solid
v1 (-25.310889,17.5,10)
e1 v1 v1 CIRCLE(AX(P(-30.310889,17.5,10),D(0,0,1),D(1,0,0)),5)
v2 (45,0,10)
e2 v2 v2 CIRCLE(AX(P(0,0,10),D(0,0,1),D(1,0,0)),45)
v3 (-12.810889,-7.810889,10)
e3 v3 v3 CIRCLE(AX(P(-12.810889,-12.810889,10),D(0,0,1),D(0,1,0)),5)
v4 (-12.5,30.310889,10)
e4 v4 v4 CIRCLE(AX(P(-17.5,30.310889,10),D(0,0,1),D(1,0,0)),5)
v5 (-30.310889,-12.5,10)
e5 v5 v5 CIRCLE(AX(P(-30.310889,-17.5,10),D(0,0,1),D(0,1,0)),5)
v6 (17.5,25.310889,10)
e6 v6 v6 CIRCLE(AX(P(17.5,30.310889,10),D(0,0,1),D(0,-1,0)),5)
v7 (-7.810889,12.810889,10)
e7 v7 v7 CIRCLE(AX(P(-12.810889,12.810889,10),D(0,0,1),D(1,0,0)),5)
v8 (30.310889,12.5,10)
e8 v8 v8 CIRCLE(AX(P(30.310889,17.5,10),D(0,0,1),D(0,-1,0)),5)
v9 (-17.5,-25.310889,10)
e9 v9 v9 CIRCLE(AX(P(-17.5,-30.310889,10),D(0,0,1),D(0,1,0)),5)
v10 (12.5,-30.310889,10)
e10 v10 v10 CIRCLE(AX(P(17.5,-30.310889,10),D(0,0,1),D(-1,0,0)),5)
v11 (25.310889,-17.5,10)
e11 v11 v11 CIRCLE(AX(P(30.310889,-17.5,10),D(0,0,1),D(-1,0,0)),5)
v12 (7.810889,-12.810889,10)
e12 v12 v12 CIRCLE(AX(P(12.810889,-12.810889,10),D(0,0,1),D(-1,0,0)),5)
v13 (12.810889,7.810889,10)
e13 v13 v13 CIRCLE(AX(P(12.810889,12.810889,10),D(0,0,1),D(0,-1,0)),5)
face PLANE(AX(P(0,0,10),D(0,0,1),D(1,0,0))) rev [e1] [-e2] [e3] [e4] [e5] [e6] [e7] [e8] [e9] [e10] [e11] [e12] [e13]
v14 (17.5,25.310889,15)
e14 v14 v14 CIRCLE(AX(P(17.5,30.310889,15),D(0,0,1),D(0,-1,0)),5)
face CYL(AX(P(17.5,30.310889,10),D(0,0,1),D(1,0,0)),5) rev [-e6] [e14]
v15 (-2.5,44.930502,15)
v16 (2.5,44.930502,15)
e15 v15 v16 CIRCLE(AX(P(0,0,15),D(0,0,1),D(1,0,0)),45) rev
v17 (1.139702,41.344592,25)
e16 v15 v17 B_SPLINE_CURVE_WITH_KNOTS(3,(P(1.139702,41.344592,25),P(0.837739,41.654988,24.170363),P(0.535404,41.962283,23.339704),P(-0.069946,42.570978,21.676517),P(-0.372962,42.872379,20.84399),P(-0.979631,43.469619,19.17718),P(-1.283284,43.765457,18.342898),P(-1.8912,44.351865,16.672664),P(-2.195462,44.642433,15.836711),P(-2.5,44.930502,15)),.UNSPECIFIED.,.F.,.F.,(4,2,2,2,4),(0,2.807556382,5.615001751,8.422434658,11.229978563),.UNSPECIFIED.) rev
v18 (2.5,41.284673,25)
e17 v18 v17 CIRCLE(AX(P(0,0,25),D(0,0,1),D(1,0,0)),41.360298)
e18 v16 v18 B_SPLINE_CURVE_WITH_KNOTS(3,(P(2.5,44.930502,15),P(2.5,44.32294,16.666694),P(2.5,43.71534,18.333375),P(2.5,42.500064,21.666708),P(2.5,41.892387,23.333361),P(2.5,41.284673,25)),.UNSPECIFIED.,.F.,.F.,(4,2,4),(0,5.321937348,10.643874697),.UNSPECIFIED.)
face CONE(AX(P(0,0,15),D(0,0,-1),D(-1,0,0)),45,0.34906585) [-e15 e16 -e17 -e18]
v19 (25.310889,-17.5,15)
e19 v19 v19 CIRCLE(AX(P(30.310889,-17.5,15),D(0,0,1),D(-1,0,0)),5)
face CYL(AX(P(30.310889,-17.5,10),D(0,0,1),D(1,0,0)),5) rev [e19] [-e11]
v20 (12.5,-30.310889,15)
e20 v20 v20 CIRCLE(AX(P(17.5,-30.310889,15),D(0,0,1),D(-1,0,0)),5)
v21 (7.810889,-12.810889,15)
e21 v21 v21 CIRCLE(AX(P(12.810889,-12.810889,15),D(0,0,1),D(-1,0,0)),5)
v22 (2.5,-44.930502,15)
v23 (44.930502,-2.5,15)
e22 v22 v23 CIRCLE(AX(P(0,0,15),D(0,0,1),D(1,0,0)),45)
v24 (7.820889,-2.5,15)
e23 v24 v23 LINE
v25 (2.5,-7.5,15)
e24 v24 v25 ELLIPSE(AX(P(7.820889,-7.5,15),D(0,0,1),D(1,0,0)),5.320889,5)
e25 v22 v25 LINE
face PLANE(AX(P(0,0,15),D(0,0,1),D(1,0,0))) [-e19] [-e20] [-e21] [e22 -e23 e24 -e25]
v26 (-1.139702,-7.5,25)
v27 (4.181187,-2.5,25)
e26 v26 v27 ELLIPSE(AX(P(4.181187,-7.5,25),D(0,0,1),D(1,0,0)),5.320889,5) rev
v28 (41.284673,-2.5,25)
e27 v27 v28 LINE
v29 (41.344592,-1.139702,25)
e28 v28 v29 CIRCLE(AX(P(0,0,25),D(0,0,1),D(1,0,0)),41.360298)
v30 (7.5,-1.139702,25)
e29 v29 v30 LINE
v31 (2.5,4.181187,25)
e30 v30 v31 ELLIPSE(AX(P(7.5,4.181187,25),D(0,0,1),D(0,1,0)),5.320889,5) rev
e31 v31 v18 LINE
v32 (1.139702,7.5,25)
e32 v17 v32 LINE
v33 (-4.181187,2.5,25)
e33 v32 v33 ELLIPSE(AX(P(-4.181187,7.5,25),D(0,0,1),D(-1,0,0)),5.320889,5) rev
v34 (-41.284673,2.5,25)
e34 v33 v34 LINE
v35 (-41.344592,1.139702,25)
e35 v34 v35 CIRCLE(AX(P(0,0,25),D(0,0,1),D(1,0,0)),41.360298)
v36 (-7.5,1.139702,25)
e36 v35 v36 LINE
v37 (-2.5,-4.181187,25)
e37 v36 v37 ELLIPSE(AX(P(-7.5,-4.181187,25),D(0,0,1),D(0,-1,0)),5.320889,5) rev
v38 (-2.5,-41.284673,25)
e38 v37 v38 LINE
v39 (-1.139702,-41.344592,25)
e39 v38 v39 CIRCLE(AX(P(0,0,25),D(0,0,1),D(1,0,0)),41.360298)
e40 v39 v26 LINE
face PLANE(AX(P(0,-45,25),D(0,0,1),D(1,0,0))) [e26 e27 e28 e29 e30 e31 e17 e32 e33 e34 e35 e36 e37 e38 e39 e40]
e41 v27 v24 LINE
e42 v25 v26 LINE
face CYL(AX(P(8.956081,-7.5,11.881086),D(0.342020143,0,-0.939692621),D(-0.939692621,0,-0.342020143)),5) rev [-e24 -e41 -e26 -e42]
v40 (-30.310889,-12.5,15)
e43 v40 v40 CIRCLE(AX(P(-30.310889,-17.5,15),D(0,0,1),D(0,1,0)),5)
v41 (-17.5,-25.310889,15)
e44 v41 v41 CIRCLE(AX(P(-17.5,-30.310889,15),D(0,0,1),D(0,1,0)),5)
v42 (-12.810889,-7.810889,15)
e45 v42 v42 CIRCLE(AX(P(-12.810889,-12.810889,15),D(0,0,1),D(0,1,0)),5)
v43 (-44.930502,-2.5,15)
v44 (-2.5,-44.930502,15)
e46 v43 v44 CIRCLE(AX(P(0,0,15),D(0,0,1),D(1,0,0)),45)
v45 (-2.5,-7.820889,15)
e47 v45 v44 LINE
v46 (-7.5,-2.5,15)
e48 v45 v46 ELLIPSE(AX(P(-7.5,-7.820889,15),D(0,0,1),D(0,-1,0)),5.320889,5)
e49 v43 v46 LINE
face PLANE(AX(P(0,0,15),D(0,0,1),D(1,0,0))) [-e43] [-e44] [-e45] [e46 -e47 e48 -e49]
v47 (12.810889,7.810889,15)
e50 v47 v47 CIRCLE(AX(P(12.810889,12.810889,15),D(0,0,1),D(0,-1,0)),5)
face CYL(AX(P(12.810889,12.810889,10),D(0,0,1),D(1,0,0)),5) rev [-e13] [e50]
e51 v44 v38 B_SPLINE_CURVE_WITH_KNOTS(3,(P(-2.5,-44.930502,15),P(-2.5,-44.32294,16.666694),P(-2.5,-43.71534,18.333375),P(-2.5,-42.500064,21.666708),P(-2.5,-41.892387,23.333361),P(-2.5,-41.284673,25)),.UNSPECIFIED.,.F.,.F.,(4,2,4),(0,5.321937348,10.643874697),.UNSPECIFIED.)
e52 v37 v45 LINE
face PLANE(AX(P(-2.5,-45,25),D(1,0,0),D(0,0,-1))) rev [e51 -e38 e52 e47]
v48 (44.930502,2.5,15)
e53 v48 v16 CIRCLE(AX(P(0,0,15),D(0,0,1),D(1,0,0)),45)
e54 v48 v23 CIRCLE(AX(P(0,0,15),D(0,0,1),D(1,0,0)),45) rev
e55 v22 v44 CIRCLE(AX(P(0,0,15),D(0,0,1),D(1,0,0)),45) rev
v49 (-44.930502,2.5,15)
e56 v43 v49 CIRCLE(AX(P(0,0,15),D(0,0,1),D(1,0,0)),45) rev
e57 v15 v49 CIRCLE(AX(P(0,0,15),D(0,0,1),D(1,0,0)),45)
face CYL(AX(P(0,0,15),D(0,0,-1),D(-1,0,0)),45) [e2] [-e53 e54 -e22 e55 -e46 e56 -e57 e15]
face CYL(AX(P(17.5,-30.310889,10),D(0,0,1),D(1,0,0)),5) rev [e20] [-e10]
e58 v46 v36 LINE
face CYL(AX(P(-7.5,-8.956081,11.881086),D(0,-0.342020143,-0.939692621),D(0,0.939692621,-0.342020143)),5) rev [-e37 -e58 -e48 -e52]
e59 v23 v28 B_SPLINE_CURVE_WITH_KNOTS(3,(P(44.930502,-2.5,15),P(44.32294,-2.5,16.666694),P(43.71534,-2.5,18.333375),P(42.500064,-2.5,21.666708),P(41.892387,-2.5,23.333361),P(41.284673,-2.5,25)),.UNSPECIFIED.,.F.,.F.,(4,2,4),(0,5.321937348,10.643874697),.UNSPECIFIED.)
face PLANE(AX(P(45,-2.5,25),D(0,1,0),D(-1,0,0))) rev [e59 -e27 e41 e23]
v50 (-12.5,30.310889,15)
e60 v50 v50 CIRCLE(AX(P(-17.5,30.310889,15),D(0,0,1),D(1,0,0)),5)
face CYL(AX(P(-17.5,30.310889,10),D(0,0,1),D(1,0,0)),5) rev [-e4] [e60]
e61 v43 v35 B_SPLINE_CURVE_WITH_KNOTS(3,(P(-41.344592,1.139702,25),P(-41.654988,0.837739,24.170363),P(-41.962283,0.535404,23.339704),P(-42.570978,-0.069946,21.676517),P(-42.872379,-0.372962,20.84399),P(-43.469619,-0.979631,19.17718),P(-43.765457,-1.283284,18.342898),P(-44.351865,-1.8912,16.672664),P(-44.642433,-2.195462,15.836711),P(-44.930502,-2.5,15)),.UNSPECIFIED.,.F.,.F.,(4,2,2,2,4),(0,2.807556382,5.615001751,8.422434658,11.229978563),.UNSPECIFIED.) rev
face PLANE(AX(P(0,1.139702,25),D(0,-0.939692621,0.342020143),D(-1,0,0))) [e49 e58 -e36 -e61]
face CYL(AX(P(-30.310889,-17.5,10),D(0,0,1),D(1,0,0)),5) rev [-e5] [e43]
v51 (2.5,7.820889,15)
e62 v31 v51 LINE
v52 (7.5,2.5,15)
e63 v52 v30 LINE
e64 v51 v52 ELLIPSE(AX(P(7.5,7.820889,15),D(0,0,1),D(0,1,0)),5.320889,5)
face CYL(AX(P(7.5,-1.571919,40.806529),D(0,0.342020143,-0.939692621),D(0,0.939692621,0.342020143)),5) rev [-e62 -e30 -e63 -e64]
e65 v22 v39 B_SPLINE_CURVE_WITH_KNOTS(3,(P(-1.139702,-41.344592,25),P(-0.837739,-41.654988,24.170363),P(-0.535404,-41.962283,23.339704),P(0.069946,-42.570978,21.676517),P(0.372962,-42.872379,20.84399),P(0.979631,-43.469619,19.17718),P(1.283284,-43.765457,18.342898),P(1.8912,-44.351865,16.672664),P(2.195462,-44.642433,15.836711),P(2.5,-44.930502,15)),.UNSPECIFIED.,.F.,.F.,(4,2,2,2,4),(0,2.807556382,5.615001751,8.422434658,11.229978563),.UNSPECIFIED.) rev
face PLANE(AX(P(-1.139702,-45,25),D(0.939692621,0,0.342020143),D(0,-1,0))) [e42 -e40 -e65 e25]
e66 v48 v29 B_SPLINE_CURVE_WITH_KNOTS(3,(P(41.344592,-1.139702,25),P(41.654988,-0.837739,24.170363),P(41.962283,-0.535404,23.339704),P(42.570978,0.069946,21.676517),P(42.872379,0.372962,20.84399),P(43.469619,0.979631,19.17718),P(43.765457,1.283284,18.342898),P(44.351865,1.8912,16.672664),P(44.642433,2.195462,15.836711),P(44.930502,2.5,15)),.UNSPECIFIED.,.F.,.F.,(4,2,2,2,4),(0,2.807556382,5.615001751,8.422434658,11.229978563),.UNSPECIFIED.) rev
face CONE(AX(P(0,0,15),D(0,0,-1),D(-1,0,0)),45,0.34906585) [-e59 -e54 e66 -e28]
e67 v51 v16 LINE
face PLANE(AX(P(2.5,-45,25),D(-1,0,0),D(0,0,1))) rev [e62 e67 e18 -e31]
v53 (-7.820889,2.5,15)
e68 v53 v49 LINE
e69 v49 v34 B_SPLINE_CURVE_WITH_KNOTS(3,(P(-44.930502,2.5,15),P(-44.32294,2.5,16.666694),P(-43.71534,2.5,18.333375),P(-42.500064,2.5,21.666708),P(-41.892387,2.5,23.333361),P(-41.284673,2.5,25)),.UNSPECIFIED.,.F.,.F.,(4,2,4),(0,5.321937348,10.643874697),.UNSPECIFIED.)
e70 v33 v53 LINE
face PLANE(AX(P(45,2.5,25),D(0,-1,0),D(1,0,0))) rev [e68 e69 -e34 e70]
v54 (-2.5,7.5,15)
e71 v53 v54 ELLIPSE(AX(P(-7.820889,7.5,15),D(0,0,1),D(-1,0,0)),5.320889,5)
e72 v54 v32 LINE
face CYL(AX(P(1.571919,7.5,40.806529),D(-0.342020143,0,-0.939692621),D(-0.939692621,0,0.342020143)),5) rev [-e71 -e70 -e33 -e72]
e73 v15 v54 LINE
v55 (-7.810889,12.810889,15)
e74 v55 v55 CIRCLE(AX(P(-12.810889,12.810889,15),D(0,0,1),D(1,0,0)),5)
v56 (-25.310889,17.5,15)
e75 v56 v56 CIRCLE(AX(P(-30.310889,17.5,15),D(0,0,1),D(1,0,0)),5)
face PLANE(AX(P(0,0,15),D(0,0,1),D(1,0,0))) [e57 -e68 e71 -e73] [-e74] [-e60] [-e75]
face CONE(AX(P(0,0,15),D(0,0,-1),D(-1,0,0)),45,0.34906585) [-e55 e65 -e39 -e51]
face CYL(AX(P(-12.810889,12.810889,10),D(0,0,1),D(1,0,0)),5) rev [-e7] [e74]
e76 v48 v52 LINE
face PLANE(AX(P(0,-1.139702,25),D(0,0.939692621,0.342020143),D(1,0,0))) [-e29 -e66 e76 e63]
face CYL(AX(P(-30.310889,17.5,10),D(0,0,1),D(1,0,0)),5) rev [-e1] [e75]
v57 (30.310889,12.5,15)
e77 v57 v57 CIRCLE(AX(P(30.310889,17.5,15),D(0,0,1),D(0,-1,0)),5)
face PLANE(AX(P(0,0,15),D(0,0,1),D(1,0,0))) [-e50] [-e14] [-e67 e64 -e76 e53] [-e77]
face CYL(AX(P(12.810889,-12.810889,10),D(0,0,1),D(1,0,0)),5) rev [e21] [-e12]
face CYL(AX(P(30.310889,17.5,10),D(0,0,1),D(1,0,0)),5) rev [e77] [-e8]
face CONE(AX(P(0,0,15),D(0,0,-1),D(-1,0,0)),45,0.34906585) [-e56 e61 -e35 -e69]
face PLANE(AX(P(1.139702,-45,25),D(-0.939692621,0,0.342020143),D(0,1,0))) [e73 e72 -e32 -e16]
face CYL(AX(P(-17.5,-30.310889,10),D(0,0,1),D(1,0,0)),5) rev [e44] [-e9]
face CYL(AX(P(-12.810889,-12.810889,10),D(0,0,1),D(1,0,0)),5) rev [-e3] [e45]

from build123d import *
from build123d.topology import SkipClean

# Parameters (mm, degrees)
BOSS_EXTRUDE1_START = 10
SKETCH1_R           = 45
BOSS_EXTRUDE1_DEPTH = 5
BOSS_EXTRUDE3_DEPTH = 10
CIRPATTERN1_COUNT   = 2
CIRPATTERN1_ANGLE   = 90
SKETCH5_OUTSIDE_W   = 124.038
SKETCH5_OUTSIDE_H   = 124.038
SKETCH5_OUTSIDE_R   = 45
CUT_EXTRUDE1_DEPTH  = 69.82949949
CHAMFER1_START      = -45
CHAMFER1_2_DEPTH    = 42.5
CHAMFER1_START_2    = 2.5
CHAMFER1_3_DEPTH    = 42.5
CHAMFER1_4_DEPTH    = 42.5
CHAMFER1_5_DEPTH    = 42.5
FILLET1_R           = 5
SKETCH6_R           = 5
CUT_EXTRUDE2_DEPTH  = 65.420493634
CIRPATTERN2_COUNT   = 4


with BuildPart() as part:
    # Sketch1 → Boss-Extrude1 (new body)
    with BuildSketch(Plane(origin=(0, 0, 0), x_dir=(0, 1, 0), z_dir=(0, 0, 1)).offset(BOSS_EXTRUDE1_START)):
        with Locations(Location((0, 0, 0), (0, 0, 270))):
            Circle(SKETCH1_R)
    extrude(amount=BOSS_EXTRUDE1_DEPTH)

    # Sketch4 → Boss-Extrude3 (add)
    with BuildSketch(Plane.XY.offset(15)):
        with BuildLine():
            Line((-2.5, -45), (-2.5, 45))
            ThreePointArc((-2.5, 45), (0, 47.5), (2.5, 45))
            Line((2.5, 45), (2.5, -45))
            ThreePointArc((2.5, -45), (0, -47.5), (-2.5, -45))
        make_face()
    boss_extrude3 = extrude(amount=BOSS_EXTRUDE3_DEPTH)

    # CirPattern1: Boss-Extrude3 ×2 about axis
    cirpattern1_axis = Axis((0, 0, 0), (0, 0, 1))
    for i in range(1, CIRPATTERN1_COUNT):
        add(boss_extrude3.rotate(cirpattern1_axis, i * CIRPATTERN1_ANGLE / (CIRPATTERN1_COUNT - 1)))

    # Sketch5 outside → Cut-Extrude1 (cut, through all)
    with SkipClean():  # the faces are left unmerged after this step: merging them gives an invalid solid
        with BuildSketch(Plane(origin=(0, 0, 10), x_dir=(1, 0, 0), z_dir=(0, 0, -1))):
            Rectangle(SKETCH5_OUTSIDE_W, SKETCH5_OUTSIDE_H)
            with Locations(Location((0, 0, 0), (0, 0, 183.184738537))):
                Circle(SKETCH5_OUTSIDE_R, mode=Mode.SUBTRACT)
        extrude(amount=-CUT_EXTRUDE1_DEPTH, mode=Mode.SUBTRACT)

    # Chamfer1: read off the stored shape, not the designer's step
    # Chamfer1 outline → Chamfer1 (revolve, cut)
    with BuildSketch(Plane.XZ):
        Polygon((45, 25), (41.360297657, 25), (45, 15), align=None)
    revolve(axis=Axis((0, 0, 0), (0, 0, 1)), mode=Mode.SUBTRACT)

    # Chamfer1 2 outline → Chamfer1 2 (cut)
    with BuildSketch(Plane(origin=(0, 0, 0), x_dir=(1, 0, 0), z_dir=(0, 1, 0)).offset(CHAMFER1_START)):
        Polygon((2.5, -15), (-1.139702343, -25), (2.5, -25), align=None)
    extrude(amount=CHAMFER1_2_DEPTH, mode=Mode.SUBTRACT)

    # Chamfer1 3 outline → Chamfer1 3 (cut)
    with BuildSketch(Plane(origin=(0, 0, 0), x_dir=(1, 0, 0), z_dir=(0, 1, 0)).offset(CHAMFER1_START_2)):
        Polygon((-2.5, -15), (-2.5, -25), (1.139702343, -25), align=None)
    extrude(amount=CHAMFER1_3_DEPTH, mode=Mode.SUBTRACT)

    # Chamfer1 4 outline → Chamfer1 4 (cut)
    with BuildSketch(Plane.YZ.offset(CHAMFER1_START)):
        Polygon((-2.5, 15), (1.139702343, 25), (-2.5, 25), align=None)
    extrude(amount=CHAMFER1_4_DEPTH, mode=Mode.SUBTRACT)

    # Chamfer1 5 outline → Chamfer1 5 (cut)
    with BuildSketch(Plane.YZ.offset(CHAMFER1_START_2)):
        Polygon((2.5, 15), (2.5, 25), (-1.139702343, 25), align=None)
    extrude(amount=CHAMFER1_5_DEPTH, mode=Mode.SUBTRACT)

    # Fillet1
    fillet1_edges = [part.edges().sort_by_distance(p)[0] for p in [
        (-0.680148828, 2.5, 20),
        (2.5, 0.680148828, 20),
        (0.680148829, -2.5, 20),
        (-2.5, -0.680148829, 20),
    ]]
    fillet(fillet1_edges, radius=FILLET1_R)

    # Sketch6 → Cut-Extrude2 (cut, through all)
    with BuildSketch(Plane.XY.offset(15)):
        with Locations((-30.310889132, 17.5)):
            Circle(SKETCH6_R)
        with Locations((-17.5, 30.310889132)):
            Circle(SKETCH6_R)
        with Locations((-12.810889132, 12.810889132)):
            Circle(SKETCH6_R)
    cut_extrude2 = extrude(amount=-CUT_EXTRUDE2_DEPTH, mode=Mode.SUBTRACT)

    # CirPattern2: Cut-Extrude2 ×4 about axis
    cirpattern2_axis = Axis((0, 0, 0), (0, 0, 1))
    for i in range(1, CIRPATTERN2_COUNT):
        add(cut_extrude2.rotate(cirpattern2_axis, i * 360 / CIRPATTERN2_COUNT), mode=Mode.SUBTRACT)


solid = part.part
